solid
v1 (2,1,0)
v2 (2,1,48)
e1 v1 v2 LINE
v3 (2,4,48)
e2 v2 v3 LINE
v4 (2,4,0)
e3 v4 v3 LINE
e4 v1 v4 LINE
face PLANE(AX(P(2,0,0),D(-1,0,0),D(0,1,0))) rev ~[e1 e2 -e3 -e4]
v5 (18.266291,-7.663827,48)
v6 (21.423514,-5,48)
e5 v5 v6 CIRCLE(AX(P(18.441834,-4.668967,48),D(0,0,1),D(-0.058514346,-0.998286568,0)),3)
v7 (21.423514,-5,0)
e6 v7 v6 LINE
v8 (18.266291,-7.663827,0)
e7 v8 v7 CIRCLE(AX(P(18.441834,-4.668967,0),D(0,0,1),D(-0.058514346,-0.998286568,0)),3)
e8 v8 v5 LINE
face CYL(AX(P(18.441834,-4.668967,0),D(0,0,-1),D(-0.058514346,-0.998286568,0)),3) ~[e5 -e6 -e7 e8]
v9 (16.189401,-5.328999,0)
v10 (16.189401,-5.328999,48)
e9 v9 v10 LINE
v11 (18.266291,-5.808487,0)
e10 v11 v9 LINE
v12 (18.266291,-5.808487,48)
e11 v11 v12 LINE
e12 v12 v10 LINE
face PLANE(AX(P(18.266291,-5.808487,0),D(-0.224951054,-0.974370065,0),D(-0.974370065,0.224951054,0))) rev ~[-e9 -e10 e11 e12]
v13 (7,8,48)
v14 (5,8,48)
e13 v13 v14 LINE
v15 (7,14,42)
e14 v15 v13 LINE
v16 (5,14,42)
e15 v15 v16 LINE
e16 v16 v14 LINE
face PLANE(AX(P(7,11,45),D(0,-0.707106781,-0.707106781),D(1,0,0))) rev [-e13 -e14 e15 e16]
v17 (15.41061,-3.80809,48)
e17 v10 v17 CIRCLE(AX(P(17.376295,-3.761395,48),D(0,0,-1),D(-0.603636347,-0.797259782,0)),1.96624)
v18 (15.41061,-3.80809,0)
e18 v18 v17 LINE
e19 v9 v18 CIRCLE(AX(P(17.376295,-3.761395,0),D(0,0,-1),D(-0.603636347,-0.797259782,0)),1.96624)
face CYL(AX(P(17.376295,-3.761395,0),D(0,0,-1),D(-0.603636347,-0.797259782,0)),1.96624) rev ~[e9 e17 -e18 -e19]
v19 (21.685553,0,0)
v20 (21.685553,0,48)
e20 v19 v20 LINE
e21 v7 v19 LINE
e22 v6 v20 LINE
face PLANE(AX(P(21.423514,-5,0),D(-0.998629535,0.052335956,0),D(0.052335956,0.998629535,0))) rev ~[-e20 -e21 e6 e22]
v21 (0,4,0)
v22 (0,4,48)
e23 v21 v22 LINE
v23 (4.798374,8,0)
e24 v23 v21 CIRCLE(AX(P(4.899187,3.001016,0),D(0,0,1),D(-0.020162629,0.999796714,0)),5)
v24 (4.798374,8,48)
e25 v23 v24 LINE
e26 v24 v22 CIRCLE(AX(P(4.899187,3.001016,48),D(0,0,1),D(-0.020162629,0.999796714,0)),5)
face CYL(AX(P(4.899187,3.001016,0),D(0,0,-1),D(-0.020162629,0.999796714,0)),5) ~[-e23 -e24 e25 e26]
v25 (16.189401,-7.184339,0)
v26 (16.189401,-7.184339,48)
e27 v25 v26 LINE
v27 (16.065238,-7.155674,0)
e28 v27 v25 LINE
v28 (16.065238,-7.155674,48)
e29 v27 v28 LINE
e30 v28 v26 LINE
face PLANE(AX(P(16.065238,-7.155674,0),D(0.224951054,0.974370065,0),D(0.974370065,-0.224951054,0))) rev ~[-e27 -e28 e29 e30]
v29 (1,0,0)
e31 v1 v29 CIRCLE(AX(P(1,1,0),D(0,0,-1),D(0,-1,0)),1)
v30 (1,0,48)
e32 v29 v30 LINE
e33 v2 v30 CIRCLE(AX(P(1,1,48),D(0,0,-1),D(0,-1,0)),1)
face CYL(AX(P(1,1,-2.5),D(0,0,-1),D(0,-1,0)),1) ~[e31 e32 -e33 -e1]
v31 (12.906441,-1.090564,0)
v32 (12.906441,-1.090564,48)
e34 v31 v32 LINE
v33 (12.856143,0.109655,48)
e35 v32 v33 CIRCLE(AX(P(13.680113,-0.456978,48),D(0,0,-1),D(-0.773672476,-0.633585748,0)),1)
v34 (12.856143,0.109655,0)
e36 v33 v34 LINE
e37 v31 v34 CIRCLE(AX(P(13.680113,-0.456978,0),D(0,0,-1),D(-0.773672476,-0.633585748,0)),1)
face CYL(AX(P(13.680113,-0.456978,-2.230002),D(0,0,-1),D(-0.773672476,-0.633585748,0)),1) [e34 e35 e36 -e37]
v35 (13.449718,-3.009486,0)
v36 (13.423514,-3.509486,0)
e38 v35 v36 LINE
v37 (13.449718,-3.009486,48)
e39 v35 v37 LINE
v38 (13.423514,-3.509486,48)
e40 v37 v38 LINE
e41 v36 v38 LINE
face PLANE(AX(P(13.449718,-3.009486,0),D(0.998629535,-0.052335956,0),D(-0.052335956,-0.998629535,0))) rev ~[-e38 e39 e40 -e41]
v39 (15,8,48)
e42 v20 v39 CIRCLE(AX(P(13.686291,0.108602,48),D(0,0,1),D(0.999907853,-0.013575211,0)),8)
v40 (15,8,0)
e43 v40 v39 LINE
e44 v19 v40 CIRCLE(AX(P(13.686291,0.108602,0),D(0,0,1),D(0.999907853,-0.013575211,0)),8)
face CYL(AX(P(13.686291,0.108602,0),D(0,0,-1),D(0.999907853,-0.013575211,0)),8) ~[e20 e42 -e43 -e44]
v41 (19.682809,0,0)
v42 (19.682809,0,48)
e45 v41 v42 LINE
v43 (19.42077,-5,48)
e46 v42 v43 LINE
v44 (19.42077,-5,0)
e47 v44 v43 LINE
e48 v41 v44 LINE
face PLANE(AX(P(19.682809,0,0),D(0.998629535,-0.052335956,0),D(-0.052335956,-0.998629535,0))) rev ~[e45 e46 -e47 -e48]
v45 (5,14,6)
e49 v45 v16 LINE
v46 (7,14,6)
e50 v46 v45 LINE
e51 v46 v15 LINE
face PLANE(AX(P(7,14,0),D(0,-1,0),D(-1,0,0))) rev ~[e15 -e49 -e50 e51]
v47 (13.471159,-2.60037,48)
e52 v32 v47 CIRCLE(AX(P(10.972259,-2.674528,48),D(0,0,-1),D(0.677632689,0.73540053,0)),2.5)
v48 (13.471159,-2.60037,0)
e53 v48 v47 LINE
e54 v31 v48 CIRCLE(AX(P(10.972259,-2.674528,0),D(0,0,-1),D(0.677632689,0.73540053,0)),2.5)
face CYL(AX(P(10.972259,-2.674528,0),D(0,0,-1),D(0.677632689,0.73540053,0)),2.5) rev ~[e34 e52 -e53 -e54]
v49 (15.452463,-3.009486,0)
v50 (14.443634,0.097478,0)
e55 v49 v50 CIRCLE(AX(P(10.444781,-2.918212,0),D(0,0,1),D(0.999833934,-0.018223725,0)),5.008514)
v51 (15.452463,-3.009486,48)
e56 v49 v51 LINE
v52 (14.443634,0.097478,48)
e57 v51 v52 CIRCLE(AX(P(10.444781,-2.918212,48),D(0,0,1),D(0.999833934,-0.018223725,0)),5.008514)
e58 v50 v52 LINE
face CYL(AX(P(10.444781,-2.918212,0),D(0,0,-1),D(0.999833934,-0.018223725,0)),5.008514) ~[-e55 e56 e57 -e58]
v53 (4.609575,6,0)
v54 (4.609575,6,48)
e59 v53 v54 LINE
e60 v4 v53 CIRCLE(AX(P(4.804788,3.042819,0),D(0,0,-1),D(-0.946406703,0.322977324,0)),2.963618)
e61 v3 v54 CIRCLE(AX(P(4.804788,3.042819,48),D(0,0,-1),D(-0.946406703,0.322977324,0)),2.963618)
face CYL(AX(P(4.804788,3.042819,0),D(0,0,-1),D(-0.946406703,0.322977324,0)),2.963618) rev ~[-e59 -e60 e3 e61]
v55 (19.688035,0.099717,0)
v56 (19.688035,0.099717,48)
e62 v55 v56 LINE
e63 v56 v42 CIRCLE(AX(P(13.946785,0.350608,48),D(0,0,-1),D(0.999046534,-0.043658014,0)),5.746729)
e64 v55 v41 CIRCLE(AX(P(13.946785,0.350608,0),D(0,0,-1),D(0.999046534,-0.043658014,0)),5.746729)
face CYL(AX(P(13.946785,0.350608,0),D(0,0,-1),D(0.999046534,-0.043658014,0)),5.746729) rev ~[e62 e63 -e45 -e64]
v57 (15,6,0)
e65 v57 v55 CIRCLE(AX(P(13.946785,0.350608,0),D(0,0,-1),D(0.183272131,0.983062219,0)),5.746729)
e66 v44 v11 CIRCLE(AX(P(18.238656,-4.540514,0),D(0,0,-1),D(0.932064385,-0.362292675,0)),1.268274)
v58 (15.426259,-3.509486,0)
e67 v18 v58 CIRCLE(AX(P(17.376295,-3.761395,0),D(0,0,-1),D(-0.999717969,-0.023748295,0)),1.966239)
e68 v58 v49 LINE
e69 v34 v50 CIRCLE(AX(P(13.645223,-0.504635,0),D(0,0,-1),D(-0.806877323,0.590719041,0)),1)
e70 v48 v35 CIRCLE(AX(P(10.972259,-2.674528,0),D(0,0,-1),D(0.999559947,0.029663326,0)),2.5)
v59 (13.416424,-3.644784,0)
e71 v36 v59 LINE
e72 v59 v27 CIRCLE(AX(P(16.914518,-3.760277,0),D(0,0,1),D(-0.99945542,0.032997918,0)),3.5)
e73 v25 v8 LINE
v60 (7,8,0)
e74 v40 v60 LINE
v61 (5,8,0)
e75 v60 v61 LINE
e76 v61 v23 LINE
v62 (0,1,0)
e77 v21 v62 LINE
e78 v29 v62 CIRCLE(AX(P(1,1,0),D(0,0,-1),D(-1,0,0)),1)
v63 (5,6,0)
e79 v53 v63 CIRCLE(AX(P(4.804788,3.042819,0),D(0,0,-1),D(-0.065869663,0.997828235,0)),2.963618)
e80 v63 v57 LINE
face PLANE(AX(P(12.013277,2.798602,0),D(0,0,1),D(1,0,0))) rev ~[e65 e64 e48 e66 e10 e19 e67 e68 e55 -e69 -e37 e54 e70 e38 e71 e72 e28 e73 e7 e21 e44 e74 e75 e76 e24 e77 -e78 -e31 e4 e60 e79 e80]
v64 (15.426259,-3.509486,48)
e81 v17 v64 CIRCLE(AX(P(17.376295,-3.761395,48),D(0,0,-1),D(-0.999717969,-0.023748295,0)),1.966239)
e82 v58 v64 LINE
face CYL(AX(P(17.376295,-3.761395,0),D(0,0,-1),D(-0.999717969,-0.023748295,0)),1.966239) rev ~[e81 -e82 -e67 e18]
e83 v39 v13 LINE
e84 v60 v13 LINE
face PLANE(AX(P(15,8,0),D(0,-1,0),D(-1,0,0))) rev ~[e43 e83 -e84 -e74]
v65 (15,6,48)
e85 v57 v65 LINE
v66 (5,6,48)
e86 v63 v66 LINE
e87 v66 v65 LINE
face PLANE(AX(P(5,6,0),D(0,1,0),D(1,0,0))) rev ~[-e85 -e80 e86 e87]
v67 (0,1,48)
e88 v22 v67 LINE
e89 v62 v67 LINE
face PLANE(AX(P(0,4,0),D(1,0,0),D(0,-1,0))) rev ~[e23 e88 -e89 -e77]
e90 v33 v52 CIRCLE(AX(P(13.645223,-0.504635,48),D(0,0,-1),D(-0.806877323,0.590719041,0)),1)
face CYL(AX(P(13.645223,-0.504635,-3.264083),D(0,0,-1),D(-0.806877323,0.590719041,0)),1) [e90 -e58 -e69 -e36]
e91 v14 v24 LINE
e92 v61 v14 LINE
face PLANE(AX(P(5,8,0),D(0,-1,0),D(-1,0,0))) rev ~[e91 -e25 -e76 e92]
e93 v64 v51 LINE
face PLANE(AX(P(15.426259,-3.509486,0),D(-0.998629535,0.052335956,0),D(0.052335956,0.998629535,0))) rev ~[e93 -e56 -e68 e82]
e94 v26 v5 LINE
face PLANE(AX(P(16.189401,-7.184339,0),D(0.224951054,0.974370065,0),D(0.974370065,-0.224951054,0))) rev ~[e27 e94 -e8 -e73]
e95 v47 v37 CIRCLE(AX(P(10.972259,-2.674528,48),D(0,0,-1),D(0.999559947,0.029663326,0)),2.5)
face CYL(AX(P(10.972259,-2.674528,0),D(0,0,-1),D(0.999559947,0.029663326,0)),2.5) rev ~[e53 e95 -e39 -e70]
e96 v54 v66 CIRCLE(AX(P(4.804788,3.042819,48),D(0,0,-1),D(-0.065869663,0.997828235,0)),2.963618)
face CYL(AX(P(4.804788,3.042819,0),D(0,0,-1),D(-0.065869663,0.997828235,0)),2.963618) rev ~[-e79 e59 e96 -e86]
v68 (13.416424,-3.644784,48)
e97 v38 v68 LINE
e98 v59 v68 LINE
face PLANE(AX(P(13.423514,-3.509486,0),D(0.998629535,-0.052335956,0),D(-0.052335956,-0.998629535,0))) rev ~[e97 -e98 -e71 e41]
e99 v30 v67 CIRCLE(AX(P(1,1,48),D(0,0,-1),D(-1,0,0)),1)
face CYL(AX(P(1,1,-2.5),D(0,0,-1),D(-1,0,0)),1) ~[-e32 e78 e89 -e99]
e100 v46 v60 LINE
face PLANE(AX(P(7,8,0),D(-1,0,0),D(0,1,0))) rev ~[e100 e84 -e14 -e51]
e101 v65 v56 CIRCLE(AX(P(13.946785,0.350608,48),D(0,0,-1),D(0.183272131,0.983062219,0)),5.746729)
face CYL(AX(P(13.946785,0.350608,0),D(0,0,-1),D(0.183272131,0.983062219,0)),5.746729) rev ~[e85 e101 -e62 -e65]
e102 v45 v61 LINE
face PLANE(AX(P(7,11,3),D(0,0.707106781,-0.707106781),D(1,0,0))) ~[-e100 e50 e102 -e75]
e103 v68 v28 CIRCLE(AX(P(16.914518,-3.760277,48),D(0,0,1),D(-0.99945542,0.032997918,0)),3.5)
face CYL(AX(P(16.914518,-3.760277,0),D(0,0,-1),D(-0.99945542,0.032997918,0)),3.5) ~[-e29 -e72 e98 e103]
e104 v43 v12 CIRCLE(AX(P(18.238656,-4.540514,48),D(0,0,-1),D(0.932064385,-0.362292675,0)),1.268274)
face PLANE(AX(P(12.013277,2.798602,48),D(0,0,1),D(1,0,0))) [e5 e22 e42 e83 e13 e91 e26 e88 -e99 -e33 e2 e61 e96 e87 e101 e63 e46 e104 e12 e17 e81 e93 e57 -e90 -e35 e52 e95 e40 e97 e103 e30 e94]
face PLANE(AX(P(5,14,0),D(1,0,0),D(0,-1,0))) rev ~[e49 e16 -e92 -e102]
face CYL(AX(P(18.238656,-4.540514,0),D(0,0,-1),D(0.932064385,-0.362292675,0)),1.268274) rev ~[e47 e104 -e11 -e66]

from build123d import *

# Parameters (mm, degrees)
F1_DEPTH    = 48
F2_SIZE     = 6
F3_T1_DEPTH = 53
F3_T3_DEPTH = 54.5281651471
F3_T5_DEPTH = 52.4600037496


# Not quite as in the source:
# - a fillet or chamfer that OpenCascade refuses, or shapes differently, is made with other operations: its cross-section is extruded or revolved along the edge and cut away or added
# - a feature names something its author has since deleted; it is built from what else it names


with BuildPart() as f1:
    # F0 (on Top) → F1 (new body)
    with BuildSketch(Plane.XY):
        with BuildLine():
            Line((0, 4), (0, 0))
            Line((0, 0), (2, 0))
            Line((2, 0), (2, 4))
            ThreePointArc((2, 4), (3.0020118724, 5.3950578705), (4.6095750202, 6))
            ThreePointArc((4.6095750202, 6), (4.8047875101, 6.0064362795), (5, 6))
            Line((5, 6), (15, 6))
            ThreePointArc((15, 6), (18.4461762663, 3.9255722455), (19.6880345723, 0.0997168751))
            ThreePointArc((19.6880345723, 0.0997168751), (19.6856381883, 0.0498470868), (19.6828086323, 0))
            Line((19.6828086323, 0), (19.4207697359, -5))
            ThreePointArc((19.4207697359, -5), (18.9661763427, -5.5793756098), (18.26629109, -5.8084866821))
            Line((18.26629109, -5.8084866821), (16.1894012844, -5.3289988895))
            ThreePointArc((16.1894012844, -5.3289988895), (15.6261580996, -4.6575642289), (15.4106099526, -3.8080900476))
            ThreePointArc((15.4106099526, -3.8080900476), (15.4127500759, -3.6584901874), (15.4262591199, -3.5094861471))
            Line((15.4262591199, -3.5094861471), (15.4524630095, -3.0094861471))
            ThreePointArc((15.4524630095, -3.0094861471), (14.9662231771, -0.7637354985), (13.5283299865, 1.0285502831))
            Line((13.5283299865, 1.0285502831), (12.346313856, -0.5859939341))
            ThreePointArc((12.346313856, -0.5859939341), (12.5114130289, -0.7045010308), (12.6663410631, -0.8360265911))
            ThreePointArc((12.6663410631, -0.8360265911), (13.2467923067, -1.6369828382), (13.4711592073, -2.6003695984))
            ThreePointArc((13.4711592073, -2.6003695984), (13.4688331774, -2.8053678054), (13.4497183175, -3.0094861471))
            Line((13.4497183175, -3.0094861471), (13.4235144279, -3.5094861471))
            Line((13.4235144279, -3.5094861471), (13.4164237789, -3.6447837895))
            ThreePointArc((13.4164237789, -3.6447837895), (14.1205058655, -5.8682370303), (16.0652377732, -7.1556739049))
            Line((16.0652377732, -7.1556739049), (16.1894012844, -7.1843393101))
            Line((16.1894012844, -7.1843393101), (18.26629109, -7.6638271027))
            ThreePointArc((18.26629109, -7.6638271027), (20.3764129686, -6.9618705168), (21.4235144279, -5))
            Line((21.4235144279, -5), (21.6855533243, 0))
            ThreePointArc((21.6855533243, 0), (19.8249274325, 5.2386247512), (15, 8))
            Line((15, 8), (7, 8))
            Line((7, 8), (7, 14))
            Line((7, 14), (5, 14))
            Line((5, 14), (5, 8))
            Line((5, 8), (4.7983737082, 8))
            ThreePointArc((4.7983737082, 8), (1.6976247354, 6.8415893063), (0, 4))
        make_face()
    extrude(amount=F1_DEPTH)

    # F2
    f2_edges = [f1.edges().sort_by_distance(p)[0] for p in [
        (6, 14, 48),
        (6, 14, 0),
    ]]
    chamfer(f2_edges, length=F2_SIZE)

    # F3: fillet of radius 1 on 4 edges, made by hand

    # F3_s2 → F3_t1 (cut)
    with BuildSketch(Plane.XY.offset(-2.5)):
        with BuildLine():
            ThreePointArc((0, 1), (0.2928932188, 0.2928932188), (1, 0))
            Line((1, 0), (0, 0))
            Line((0, 0), (0, 1))
        make_face()
        with BuildLine():
            ThreePointArc((1, 0), (1.7071067812, 0.2928932188), (2, 1))
            Line((2, 1), (2, 0))
            Line((2, 0), (1, 0))
        make_face()
    extrude(amount=F3_T1_DEPTH, mode=Mode.SUBTRACT)

    # F3_s4 → F3_t3 (cut)
    with BuildSketch(Plane.XY.offset(-3.2640825735)):
        with BuildLine():
            ThreePointArc((12.8383454605, 0.0860838499), (13.6381253577, 0.495339622), (14.4436338584, 0.0974775525))
            ThreePointArc((14.4436338584, 0.0974775525), (14.0164512092, 0.5929671699), (13.5283299865, 1.0285502831))
            Line((13.5283299865, 1.0285502831), (12.8383454605, 0.0860838499))
        make_face()
    extrude(amount=F3_T3_DEPTH, mode=Mode.SUBTRACT)

    # F3_s6 → F3_t5 (cut)
    with BuildSketch(Plane.XY.offset(-2.2300018748)):
        with BuildLine():
            ThreePointArc((12.9064405307, -1.0905635453), (12.6804805888, -0.4840892178), (12.8732356835, 0.1337412433))
            Line((12.8732356835, 0.1337412433), (12.346313856, -0.5859939341))
            ThreePointArc((12.346313856, -0.5859939341), (12.6455057343, -0.8170439967), (12.9064405307, -1.0905635453))
        make_face()
    extrude(amount=F3_T5_DEPTH, mode=Mode.SUBTRACT)


solid = f1.part
